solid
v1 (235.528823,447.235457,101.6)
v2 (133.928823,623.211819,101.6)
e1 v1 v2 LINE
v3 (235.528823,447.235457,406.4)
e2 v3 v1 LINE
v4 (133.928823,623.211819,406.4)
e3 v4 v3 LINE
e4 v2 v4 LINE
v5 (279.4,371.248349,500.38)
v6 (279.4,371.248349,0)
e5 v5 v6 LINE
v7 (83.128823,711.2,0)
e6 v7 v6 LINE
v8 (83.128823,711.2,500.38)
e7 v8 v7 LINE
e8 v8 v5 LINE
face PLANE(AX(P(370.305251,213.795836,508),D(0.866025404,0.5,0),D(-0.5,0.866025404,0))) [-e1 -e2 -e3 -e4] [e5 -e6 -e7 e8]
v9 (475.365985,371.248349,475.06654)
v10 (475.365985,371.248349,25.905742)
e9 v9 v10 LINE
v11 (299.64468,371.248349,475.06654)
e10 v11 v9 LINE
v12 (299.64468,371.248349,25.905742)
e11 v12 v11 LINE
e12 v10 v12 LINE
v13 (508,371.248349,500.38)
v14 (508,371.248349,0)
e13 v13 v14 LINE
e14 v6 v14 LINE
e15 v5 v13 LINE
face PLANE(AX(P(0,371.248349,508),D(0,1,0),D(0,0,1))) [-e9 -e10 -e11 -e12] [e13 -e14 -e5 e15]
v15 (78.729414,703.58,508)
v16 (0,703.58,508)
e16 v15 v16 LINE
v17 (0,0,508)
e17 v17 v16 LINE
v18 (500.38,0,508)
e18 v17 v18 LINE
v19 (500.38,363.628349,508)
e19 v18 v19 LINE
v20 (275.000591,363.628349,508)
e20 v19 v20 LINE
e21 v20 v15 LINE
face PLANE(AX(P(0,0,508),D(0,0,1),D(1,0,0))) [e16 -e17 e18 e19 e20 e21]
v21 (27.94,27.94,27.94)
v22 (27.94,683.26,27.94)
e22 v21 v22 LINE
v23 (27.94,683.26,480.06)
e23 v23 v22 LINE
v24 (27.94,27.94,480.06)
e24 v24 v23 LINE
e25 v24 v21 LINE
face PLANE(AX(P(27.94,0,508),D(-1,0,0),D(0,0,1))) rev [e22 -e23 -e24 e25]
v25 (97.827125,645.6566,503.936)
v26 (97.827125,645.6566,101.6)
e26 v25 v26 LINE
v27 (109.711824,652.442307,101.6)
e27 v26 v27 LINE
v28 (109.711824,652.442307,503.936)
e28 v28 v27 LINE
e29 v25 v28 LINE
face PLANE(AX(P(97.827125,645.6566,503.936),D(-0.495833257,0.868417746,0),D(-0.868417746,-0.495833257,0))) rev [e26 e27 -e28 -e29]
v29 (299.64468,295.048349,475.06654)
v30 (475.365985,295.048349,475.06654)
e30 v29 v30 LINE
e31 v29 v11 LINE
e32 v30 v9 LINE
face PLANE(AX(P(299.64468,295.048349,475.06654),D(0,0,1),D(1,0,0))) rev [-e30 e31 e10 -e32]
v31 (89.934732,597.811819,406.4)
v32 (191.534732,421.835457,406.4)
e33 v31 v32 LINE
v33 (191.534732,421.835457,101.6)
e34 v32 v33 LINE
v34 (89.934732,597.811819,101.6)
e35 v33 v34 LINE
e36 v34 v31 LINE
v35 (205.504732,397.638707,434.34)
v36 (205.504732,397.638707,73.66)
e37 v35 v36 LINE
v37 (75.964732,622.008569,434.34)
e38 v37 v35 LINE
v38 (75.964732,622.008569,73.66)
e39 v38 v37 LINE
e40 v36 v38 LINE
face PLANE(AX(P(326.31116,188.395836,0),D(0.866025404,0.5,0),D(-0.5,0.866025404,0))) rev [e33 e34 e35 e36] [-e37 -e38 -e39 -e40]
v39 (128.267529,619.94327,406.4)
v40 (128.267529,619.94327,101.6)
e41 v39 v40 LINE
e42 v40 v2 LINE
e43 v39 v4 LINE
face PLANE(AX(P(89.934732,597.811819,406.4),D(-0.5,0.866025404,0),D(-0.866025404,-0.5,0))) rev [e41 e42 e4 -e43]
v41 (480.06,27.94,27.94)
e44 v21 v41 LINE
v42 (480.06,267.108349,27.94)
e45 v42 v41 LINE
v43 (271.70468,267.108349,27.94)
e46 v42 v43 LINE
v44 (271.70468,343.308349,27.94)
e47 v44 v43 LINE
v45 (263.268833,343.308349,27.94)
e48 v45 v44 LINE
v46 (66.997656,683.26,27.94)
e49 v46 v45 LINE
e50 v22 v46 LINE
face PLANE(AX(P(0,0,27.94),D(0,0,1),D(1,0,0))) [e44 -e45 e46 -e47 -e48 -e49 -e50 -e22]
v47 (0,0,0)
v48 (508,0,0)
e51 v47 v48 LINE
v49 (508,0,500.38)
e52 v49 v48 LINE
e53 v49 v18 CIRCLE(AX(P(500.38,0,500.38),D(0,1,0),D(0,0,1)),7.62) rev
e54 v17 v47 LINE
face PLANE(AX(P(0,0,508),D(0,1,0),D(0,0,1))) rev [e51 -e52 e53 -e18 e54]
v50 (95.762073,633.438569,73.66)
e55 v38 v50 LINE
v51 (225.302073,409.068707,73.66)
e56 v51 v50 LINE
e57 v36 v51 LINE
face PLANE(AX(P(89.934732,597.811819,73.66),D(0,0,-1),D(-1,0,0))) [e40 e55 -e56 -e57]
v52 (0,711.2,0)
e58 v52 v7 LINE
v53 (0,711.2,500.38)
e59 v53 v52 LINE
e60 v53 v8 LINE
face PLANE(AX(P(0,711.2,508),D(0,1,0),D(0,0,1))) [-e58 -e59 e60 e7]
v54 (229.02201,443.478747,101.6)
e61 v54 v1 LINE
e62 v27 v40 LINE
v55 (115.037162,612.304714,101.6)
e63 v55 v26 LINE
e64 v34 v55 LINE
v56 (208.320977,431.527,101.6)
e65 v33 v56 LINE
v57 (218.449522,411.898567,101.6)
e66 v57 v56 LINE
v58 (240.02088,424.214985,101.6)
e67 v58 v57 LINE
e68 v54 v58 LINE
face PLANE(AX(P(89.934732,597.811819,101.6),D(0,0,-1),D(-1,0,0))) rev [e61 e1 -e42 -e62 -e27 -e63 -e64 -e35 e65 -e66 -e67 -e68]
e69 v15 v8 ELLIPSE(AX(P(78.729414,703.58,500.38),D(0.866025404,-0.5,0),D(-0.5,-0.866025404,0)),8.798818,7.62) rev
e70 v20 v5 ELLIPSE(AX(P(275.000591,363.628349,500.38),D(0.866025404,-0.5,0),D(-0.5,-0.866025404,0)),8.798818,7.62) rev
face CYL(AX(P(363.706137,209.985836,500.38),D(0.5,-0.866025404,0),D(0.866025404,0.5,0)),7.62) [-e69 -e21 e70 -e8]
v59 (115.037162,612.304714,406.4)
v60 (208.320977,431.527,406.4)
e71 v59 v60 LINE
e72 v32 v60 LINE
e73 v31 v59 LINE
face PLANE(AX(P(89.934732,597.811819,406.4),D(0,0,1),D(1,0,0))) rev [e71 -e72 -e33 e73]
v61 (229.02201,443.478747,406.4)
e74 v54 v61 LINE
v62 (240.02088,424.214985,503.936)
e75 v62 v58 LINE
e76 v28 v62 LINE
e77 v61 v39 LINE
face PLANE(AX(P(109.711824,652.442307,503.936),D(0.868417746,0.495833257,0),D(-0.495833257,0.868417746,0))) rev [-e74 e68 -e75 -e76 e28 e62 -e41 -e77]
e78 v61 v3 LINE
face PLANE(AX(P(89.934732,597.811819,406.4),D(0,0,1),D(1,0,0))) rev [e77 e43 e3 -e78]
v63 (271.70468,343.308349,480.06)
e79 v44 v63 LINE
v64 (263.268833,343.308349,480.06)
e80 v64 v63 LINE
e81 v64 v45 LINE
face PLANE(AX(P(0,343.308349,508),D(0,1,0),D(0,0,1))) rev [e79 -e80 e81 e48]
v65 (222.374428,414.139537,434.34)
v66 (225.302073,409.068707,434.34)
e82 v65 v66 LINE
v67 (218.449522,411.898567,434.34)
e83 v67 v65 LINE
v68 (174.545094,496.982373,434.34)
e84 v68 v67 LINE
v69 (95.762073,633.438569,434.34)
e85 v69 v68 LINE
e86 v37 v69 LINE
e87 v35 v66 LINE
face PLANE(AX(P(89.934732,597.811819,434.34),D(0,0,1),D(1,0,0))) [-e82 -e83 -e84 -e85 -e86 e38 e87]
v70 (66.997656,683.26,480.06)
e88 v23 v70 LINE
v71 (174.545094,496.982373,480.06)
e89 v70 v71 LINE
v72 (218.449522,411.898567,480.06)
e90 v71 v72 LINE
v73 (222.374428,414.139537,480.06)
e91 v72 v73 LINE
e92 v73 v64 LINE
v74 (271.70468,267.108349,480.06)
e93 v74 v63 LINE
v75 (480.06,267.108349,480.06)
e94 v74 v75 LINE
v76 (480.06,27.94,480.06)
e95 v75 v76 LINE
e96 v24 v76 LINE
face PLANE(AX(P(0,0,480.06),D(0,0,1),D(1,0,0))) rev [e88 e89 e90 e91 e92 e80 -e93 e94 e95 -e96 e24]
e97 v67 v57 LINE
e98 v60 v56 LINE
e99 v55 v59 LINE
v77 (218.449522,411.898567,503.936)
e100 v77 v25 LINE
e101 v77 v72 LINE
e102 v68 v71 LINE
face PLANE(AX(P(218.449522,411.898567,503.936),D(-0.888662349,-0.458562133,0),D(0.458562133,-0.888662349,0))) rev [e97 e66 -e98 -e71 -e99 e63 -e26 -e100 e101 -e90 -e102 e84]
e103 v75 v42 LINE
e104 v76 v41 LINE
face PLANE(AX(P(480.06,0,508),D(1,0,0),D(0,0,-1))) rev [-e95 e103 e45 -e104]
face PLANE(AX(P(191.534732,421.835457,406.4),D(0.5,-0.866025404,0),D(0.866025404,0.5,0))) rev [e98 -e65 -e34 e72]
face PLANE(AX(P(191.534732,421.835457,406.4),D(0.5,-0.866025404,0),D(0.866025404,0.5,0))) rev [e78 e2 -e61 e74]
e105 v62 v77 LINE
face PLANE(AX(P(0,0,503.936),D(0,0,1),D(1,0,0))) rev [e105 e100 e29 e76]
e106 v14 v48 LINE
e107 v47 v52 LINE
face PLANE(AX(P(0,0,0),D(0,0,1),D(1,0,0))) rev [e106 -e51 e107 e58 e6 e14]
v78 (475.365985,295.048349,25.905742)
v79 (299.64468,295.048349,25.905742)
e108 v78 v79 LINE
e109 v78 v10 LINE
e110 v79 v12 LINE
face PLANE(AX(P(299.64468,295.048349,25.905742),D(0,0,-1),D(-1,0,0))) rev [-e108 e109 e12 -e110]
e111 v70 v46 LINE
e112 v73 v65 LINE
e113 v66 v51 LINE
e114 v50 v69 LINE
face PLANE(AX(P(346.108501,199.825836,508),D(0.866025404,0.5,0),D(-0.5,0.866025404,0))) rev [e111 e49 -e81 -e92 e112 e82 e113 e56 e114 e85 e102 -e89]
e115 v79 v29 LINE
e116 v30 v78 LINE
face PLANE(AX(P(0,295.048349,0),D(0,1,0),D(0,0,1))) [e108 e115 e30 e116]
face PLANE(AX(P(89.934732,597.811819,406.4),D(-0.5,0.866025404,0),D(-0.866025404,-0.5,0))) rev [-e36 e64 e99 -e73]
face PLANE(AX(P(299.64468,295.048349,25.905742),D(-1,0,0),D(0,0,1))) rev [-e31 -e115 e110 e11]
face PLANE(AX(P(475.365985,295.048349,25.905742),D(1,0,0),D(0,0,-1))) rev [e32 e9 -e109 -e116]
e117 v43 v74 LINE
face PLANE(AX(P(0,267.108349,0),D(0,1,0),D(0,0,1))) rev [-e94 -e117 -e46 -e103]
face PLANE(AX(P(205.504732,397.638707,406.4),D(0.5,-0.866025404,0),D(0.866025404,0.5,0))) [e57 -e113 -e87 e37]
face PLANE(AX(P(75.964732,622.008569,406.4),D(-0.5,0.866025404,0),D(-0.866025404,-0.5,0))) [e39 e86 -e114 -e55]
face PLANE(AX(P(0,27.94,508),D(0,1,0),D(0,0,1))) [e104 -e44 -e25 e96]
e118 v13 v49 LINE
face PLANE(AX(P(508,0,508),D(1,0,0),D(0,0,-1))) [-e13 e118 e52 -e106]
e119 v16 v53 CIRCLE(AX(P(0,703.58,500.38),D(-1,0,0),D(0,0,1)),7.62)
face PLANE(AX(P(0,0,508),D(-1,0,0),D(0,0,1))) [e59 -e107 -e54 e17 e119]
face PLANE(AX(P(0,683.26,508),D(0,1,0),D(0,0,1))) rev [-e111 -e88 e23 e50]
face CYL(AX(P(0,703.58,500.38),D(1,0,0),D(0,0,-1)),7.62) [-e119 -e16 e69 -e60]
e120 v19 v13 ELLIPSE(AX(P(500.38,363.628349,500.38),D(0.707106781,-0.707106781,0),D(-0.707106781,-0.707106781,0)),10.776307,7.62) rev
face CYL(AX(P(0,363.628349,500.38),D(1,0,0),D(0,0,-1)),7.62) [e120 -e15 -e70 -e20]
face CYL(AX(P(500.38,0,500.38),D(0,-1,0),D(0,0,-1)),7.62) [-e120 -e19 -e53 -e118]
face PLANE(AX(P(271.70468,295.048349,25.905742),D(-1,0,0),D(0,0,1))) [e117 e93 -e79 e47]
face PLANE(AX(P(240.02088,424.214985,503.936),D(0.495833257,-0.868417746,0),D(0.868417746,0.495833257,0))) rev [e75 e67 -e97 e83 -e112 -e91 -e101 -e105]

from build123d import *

# Parameters (mm, degrees)
BOSS_EXTRUDE1_DEPTH            = 508
SKETCH2_W                      = 175.72130466
SKETCH2_H                      = 449.160798253
CUT_EXTRUDE1_DEPTH             = 76.2
SKETCH3_W                      = 304.8
SKETCH3_H                      = 203.2
CUT_EXTRUDE3_DEPTH             = 50.8
SHELL2_START                   = 27.94
SHELL2_DEPTH                   = 452.12
SHELL2_2_DEPTH                 = 45.72
SHELL2_START_2                 = 434.34
SHELL2_3_DEPTH                 = 45.72
FILLET1_R                      = 7.62
CUT_EXTRUDE4_REACH             = 965.862
CUT_EXTRUDE4_DIRECTION_2_DEPTH = 97.536


# Read off the part's stored shape, not the designer's step: Shell2
with BuildPart() as part:
    # Sketch1 → Boss-Extrude1 (new body)
    with BuildSketch(Plane.XY):
        Polygon((508, 0), (508, 371.248348728), (279.4, 371.248348728), (83.128822626, 711.2), (0, 711.2), (0, 0), align=None)
    extrude(amount=BOSS_EXTRUDE1_DEPTH)

    # Sketch2 → Cut-Extrude1 (cut)
    with BuildSketch(Plane(origin=(0, 371.248348728, 0), x_dir=(1, 0, 0), z_dir=(0, 1, 0))):
        with Locations((387.505332687, -250.48614125)):
            Rectangle(SKETCH2_W, SKETCH2_H)
    extrude(amount=-CUT_EXTRUDE1_DEPTH, mode=Mode.SUBTRACT)

    # Sketch3 → Cut-Extrude3 (cut)
    with BuildSketch(Plane(origin=(370.305250556, 213.795836091, 0), x_dir=(0, 0, -1), z_dir=(0.8660254037844397, 0.49999999999999806, 0))):
        with Locations((-254, 371.152855858)):
            Rectangle(SKETCH3_W, SKETCH3_H)
    extrude(amount=-CUT_EXTRUDE3_DEPTH, mode=Mode.SUBTRACT)

    # Shell2 outline → Shell2 (cut)
    with BuildSketch(Plane.XY.offset(SHELL2_START)):
        Polygon((27.94, 27.94), (480.06, 27.94), (480.06, 267.108348728), (271.704680357, 267.108348728), (271.704680357, 343.308348728), (263.268833479, 343.308348728), (225.302072845, 409.068707145), (205.504732114, 397.638707145), (191.534732114, 421.835456927), (89.934732114, 597.811818976), (75.964732114, 622.008568757), (95.762072845, 633.438568757), (66.997656105, 683.26), (27.94, 683.26), align=None)
    extrude(amount=SHELL2_DEPTH, mode=Mode.SUBTRACT)

    # Shell2 2 outline → Shell2 2 (cut)
    with BuildSketch(Plane.XY.offset(SHELL2_START)):
        Polygon((225.302072845, 409.068707145), (95.762072845, 633.438568757), (75.964732114, 622.008568757), (89.934732114, 597.811818976), (191.534732114, 421.835456927), (205.504732114, 397.638707145), align=None)
    extrude(amount=SHELL2_2_DEPTH, mode=Mode.SUBTRACT)

    # Shell2 3 outline → Shell2 3 (cut)
    with BuildSketch(Plane.XY.offset(SHELL2_START_2)):
        Polygon((225.302072845, 409.068707145), (95.762072845, 633.438568757), (75.964732114, 622.008568757), (89.934732114, 597.811818976), (191.534732114, 421.835456927), (205.504732114, 397.638707145), align=None)
    extrude(amount=SHELL2_3_DEPTH, mode=Mode.SUBTRACT)

    # Fillet1
    fillet1_edges = [part.edges().sort_by_distance(p)[0] for p in [
        (393.7, 371.248348728, 508),
        (181.264411313, 541.224174364, 508),
        (41.564411313, 711.2, 508),
        (508, 185.624174364, 508),
    ]]
    fillet(fillet1_edges, radius=FILLET1_R)

    # Cut-Extrude4: up to this face of the body (flat: up to its plane)
    cut_extrude4_end = Plane(part.part.faces().sort_by_distance((162.73177737, 522.523637951, 101.6))[0])
    # Sketch6 → Cut-Extrude4 (cut, up to the picked face)
    with BuildSketch(Plane(origin=(0, 0, 406.4), x_dir=(-1, 0, 0), z_dir=(0, 0, -1)), mode=Mode.PRIVATE) as cut_extrude4_sk1:
        Polygon((-109.711824261, 652.442307464), (-240.02087993, 424.214985446), (-218.44952186, 411.898566558), (-97.827125151, 645.656599669), align=None)
    cut_extrude4_tool1 = split(extrude(cut_extrude4_sk1.sketch, amount=CUT_EXTRUDE4_REACH, mode=Mode.PRIVATE), bisect_by=cut_extrude4_end, keep=Keep.BOTH, mode=Mode.PRIVATE)
    add(cut_extrude4_tool1.solids().sort_by(Axis((172.556766, 522.406417, 406.4), (0, 0, -1)))[0], mode=Mode.SUBTRACT)

    # Sketch6 → Cut-Extrude4 direction 2 (cut)
    with BuildSketch(Plane(origin=(0, 0, 406.4), x_dir=(-1, 0, 0), z_dir=(0, 0, -1))):
        Polygon((-109.711824261, 652.442307464), (-240.02087993, 424.214985446), (-218.44952186, 411.898566558), (-97.827125151, 645.656599669), align=None)
    extrude(amount=-CUT_EXTRUDE4_DIRECTION_2_DEPTH, mode=Mode.SUBTRACT)


solid = part.part
